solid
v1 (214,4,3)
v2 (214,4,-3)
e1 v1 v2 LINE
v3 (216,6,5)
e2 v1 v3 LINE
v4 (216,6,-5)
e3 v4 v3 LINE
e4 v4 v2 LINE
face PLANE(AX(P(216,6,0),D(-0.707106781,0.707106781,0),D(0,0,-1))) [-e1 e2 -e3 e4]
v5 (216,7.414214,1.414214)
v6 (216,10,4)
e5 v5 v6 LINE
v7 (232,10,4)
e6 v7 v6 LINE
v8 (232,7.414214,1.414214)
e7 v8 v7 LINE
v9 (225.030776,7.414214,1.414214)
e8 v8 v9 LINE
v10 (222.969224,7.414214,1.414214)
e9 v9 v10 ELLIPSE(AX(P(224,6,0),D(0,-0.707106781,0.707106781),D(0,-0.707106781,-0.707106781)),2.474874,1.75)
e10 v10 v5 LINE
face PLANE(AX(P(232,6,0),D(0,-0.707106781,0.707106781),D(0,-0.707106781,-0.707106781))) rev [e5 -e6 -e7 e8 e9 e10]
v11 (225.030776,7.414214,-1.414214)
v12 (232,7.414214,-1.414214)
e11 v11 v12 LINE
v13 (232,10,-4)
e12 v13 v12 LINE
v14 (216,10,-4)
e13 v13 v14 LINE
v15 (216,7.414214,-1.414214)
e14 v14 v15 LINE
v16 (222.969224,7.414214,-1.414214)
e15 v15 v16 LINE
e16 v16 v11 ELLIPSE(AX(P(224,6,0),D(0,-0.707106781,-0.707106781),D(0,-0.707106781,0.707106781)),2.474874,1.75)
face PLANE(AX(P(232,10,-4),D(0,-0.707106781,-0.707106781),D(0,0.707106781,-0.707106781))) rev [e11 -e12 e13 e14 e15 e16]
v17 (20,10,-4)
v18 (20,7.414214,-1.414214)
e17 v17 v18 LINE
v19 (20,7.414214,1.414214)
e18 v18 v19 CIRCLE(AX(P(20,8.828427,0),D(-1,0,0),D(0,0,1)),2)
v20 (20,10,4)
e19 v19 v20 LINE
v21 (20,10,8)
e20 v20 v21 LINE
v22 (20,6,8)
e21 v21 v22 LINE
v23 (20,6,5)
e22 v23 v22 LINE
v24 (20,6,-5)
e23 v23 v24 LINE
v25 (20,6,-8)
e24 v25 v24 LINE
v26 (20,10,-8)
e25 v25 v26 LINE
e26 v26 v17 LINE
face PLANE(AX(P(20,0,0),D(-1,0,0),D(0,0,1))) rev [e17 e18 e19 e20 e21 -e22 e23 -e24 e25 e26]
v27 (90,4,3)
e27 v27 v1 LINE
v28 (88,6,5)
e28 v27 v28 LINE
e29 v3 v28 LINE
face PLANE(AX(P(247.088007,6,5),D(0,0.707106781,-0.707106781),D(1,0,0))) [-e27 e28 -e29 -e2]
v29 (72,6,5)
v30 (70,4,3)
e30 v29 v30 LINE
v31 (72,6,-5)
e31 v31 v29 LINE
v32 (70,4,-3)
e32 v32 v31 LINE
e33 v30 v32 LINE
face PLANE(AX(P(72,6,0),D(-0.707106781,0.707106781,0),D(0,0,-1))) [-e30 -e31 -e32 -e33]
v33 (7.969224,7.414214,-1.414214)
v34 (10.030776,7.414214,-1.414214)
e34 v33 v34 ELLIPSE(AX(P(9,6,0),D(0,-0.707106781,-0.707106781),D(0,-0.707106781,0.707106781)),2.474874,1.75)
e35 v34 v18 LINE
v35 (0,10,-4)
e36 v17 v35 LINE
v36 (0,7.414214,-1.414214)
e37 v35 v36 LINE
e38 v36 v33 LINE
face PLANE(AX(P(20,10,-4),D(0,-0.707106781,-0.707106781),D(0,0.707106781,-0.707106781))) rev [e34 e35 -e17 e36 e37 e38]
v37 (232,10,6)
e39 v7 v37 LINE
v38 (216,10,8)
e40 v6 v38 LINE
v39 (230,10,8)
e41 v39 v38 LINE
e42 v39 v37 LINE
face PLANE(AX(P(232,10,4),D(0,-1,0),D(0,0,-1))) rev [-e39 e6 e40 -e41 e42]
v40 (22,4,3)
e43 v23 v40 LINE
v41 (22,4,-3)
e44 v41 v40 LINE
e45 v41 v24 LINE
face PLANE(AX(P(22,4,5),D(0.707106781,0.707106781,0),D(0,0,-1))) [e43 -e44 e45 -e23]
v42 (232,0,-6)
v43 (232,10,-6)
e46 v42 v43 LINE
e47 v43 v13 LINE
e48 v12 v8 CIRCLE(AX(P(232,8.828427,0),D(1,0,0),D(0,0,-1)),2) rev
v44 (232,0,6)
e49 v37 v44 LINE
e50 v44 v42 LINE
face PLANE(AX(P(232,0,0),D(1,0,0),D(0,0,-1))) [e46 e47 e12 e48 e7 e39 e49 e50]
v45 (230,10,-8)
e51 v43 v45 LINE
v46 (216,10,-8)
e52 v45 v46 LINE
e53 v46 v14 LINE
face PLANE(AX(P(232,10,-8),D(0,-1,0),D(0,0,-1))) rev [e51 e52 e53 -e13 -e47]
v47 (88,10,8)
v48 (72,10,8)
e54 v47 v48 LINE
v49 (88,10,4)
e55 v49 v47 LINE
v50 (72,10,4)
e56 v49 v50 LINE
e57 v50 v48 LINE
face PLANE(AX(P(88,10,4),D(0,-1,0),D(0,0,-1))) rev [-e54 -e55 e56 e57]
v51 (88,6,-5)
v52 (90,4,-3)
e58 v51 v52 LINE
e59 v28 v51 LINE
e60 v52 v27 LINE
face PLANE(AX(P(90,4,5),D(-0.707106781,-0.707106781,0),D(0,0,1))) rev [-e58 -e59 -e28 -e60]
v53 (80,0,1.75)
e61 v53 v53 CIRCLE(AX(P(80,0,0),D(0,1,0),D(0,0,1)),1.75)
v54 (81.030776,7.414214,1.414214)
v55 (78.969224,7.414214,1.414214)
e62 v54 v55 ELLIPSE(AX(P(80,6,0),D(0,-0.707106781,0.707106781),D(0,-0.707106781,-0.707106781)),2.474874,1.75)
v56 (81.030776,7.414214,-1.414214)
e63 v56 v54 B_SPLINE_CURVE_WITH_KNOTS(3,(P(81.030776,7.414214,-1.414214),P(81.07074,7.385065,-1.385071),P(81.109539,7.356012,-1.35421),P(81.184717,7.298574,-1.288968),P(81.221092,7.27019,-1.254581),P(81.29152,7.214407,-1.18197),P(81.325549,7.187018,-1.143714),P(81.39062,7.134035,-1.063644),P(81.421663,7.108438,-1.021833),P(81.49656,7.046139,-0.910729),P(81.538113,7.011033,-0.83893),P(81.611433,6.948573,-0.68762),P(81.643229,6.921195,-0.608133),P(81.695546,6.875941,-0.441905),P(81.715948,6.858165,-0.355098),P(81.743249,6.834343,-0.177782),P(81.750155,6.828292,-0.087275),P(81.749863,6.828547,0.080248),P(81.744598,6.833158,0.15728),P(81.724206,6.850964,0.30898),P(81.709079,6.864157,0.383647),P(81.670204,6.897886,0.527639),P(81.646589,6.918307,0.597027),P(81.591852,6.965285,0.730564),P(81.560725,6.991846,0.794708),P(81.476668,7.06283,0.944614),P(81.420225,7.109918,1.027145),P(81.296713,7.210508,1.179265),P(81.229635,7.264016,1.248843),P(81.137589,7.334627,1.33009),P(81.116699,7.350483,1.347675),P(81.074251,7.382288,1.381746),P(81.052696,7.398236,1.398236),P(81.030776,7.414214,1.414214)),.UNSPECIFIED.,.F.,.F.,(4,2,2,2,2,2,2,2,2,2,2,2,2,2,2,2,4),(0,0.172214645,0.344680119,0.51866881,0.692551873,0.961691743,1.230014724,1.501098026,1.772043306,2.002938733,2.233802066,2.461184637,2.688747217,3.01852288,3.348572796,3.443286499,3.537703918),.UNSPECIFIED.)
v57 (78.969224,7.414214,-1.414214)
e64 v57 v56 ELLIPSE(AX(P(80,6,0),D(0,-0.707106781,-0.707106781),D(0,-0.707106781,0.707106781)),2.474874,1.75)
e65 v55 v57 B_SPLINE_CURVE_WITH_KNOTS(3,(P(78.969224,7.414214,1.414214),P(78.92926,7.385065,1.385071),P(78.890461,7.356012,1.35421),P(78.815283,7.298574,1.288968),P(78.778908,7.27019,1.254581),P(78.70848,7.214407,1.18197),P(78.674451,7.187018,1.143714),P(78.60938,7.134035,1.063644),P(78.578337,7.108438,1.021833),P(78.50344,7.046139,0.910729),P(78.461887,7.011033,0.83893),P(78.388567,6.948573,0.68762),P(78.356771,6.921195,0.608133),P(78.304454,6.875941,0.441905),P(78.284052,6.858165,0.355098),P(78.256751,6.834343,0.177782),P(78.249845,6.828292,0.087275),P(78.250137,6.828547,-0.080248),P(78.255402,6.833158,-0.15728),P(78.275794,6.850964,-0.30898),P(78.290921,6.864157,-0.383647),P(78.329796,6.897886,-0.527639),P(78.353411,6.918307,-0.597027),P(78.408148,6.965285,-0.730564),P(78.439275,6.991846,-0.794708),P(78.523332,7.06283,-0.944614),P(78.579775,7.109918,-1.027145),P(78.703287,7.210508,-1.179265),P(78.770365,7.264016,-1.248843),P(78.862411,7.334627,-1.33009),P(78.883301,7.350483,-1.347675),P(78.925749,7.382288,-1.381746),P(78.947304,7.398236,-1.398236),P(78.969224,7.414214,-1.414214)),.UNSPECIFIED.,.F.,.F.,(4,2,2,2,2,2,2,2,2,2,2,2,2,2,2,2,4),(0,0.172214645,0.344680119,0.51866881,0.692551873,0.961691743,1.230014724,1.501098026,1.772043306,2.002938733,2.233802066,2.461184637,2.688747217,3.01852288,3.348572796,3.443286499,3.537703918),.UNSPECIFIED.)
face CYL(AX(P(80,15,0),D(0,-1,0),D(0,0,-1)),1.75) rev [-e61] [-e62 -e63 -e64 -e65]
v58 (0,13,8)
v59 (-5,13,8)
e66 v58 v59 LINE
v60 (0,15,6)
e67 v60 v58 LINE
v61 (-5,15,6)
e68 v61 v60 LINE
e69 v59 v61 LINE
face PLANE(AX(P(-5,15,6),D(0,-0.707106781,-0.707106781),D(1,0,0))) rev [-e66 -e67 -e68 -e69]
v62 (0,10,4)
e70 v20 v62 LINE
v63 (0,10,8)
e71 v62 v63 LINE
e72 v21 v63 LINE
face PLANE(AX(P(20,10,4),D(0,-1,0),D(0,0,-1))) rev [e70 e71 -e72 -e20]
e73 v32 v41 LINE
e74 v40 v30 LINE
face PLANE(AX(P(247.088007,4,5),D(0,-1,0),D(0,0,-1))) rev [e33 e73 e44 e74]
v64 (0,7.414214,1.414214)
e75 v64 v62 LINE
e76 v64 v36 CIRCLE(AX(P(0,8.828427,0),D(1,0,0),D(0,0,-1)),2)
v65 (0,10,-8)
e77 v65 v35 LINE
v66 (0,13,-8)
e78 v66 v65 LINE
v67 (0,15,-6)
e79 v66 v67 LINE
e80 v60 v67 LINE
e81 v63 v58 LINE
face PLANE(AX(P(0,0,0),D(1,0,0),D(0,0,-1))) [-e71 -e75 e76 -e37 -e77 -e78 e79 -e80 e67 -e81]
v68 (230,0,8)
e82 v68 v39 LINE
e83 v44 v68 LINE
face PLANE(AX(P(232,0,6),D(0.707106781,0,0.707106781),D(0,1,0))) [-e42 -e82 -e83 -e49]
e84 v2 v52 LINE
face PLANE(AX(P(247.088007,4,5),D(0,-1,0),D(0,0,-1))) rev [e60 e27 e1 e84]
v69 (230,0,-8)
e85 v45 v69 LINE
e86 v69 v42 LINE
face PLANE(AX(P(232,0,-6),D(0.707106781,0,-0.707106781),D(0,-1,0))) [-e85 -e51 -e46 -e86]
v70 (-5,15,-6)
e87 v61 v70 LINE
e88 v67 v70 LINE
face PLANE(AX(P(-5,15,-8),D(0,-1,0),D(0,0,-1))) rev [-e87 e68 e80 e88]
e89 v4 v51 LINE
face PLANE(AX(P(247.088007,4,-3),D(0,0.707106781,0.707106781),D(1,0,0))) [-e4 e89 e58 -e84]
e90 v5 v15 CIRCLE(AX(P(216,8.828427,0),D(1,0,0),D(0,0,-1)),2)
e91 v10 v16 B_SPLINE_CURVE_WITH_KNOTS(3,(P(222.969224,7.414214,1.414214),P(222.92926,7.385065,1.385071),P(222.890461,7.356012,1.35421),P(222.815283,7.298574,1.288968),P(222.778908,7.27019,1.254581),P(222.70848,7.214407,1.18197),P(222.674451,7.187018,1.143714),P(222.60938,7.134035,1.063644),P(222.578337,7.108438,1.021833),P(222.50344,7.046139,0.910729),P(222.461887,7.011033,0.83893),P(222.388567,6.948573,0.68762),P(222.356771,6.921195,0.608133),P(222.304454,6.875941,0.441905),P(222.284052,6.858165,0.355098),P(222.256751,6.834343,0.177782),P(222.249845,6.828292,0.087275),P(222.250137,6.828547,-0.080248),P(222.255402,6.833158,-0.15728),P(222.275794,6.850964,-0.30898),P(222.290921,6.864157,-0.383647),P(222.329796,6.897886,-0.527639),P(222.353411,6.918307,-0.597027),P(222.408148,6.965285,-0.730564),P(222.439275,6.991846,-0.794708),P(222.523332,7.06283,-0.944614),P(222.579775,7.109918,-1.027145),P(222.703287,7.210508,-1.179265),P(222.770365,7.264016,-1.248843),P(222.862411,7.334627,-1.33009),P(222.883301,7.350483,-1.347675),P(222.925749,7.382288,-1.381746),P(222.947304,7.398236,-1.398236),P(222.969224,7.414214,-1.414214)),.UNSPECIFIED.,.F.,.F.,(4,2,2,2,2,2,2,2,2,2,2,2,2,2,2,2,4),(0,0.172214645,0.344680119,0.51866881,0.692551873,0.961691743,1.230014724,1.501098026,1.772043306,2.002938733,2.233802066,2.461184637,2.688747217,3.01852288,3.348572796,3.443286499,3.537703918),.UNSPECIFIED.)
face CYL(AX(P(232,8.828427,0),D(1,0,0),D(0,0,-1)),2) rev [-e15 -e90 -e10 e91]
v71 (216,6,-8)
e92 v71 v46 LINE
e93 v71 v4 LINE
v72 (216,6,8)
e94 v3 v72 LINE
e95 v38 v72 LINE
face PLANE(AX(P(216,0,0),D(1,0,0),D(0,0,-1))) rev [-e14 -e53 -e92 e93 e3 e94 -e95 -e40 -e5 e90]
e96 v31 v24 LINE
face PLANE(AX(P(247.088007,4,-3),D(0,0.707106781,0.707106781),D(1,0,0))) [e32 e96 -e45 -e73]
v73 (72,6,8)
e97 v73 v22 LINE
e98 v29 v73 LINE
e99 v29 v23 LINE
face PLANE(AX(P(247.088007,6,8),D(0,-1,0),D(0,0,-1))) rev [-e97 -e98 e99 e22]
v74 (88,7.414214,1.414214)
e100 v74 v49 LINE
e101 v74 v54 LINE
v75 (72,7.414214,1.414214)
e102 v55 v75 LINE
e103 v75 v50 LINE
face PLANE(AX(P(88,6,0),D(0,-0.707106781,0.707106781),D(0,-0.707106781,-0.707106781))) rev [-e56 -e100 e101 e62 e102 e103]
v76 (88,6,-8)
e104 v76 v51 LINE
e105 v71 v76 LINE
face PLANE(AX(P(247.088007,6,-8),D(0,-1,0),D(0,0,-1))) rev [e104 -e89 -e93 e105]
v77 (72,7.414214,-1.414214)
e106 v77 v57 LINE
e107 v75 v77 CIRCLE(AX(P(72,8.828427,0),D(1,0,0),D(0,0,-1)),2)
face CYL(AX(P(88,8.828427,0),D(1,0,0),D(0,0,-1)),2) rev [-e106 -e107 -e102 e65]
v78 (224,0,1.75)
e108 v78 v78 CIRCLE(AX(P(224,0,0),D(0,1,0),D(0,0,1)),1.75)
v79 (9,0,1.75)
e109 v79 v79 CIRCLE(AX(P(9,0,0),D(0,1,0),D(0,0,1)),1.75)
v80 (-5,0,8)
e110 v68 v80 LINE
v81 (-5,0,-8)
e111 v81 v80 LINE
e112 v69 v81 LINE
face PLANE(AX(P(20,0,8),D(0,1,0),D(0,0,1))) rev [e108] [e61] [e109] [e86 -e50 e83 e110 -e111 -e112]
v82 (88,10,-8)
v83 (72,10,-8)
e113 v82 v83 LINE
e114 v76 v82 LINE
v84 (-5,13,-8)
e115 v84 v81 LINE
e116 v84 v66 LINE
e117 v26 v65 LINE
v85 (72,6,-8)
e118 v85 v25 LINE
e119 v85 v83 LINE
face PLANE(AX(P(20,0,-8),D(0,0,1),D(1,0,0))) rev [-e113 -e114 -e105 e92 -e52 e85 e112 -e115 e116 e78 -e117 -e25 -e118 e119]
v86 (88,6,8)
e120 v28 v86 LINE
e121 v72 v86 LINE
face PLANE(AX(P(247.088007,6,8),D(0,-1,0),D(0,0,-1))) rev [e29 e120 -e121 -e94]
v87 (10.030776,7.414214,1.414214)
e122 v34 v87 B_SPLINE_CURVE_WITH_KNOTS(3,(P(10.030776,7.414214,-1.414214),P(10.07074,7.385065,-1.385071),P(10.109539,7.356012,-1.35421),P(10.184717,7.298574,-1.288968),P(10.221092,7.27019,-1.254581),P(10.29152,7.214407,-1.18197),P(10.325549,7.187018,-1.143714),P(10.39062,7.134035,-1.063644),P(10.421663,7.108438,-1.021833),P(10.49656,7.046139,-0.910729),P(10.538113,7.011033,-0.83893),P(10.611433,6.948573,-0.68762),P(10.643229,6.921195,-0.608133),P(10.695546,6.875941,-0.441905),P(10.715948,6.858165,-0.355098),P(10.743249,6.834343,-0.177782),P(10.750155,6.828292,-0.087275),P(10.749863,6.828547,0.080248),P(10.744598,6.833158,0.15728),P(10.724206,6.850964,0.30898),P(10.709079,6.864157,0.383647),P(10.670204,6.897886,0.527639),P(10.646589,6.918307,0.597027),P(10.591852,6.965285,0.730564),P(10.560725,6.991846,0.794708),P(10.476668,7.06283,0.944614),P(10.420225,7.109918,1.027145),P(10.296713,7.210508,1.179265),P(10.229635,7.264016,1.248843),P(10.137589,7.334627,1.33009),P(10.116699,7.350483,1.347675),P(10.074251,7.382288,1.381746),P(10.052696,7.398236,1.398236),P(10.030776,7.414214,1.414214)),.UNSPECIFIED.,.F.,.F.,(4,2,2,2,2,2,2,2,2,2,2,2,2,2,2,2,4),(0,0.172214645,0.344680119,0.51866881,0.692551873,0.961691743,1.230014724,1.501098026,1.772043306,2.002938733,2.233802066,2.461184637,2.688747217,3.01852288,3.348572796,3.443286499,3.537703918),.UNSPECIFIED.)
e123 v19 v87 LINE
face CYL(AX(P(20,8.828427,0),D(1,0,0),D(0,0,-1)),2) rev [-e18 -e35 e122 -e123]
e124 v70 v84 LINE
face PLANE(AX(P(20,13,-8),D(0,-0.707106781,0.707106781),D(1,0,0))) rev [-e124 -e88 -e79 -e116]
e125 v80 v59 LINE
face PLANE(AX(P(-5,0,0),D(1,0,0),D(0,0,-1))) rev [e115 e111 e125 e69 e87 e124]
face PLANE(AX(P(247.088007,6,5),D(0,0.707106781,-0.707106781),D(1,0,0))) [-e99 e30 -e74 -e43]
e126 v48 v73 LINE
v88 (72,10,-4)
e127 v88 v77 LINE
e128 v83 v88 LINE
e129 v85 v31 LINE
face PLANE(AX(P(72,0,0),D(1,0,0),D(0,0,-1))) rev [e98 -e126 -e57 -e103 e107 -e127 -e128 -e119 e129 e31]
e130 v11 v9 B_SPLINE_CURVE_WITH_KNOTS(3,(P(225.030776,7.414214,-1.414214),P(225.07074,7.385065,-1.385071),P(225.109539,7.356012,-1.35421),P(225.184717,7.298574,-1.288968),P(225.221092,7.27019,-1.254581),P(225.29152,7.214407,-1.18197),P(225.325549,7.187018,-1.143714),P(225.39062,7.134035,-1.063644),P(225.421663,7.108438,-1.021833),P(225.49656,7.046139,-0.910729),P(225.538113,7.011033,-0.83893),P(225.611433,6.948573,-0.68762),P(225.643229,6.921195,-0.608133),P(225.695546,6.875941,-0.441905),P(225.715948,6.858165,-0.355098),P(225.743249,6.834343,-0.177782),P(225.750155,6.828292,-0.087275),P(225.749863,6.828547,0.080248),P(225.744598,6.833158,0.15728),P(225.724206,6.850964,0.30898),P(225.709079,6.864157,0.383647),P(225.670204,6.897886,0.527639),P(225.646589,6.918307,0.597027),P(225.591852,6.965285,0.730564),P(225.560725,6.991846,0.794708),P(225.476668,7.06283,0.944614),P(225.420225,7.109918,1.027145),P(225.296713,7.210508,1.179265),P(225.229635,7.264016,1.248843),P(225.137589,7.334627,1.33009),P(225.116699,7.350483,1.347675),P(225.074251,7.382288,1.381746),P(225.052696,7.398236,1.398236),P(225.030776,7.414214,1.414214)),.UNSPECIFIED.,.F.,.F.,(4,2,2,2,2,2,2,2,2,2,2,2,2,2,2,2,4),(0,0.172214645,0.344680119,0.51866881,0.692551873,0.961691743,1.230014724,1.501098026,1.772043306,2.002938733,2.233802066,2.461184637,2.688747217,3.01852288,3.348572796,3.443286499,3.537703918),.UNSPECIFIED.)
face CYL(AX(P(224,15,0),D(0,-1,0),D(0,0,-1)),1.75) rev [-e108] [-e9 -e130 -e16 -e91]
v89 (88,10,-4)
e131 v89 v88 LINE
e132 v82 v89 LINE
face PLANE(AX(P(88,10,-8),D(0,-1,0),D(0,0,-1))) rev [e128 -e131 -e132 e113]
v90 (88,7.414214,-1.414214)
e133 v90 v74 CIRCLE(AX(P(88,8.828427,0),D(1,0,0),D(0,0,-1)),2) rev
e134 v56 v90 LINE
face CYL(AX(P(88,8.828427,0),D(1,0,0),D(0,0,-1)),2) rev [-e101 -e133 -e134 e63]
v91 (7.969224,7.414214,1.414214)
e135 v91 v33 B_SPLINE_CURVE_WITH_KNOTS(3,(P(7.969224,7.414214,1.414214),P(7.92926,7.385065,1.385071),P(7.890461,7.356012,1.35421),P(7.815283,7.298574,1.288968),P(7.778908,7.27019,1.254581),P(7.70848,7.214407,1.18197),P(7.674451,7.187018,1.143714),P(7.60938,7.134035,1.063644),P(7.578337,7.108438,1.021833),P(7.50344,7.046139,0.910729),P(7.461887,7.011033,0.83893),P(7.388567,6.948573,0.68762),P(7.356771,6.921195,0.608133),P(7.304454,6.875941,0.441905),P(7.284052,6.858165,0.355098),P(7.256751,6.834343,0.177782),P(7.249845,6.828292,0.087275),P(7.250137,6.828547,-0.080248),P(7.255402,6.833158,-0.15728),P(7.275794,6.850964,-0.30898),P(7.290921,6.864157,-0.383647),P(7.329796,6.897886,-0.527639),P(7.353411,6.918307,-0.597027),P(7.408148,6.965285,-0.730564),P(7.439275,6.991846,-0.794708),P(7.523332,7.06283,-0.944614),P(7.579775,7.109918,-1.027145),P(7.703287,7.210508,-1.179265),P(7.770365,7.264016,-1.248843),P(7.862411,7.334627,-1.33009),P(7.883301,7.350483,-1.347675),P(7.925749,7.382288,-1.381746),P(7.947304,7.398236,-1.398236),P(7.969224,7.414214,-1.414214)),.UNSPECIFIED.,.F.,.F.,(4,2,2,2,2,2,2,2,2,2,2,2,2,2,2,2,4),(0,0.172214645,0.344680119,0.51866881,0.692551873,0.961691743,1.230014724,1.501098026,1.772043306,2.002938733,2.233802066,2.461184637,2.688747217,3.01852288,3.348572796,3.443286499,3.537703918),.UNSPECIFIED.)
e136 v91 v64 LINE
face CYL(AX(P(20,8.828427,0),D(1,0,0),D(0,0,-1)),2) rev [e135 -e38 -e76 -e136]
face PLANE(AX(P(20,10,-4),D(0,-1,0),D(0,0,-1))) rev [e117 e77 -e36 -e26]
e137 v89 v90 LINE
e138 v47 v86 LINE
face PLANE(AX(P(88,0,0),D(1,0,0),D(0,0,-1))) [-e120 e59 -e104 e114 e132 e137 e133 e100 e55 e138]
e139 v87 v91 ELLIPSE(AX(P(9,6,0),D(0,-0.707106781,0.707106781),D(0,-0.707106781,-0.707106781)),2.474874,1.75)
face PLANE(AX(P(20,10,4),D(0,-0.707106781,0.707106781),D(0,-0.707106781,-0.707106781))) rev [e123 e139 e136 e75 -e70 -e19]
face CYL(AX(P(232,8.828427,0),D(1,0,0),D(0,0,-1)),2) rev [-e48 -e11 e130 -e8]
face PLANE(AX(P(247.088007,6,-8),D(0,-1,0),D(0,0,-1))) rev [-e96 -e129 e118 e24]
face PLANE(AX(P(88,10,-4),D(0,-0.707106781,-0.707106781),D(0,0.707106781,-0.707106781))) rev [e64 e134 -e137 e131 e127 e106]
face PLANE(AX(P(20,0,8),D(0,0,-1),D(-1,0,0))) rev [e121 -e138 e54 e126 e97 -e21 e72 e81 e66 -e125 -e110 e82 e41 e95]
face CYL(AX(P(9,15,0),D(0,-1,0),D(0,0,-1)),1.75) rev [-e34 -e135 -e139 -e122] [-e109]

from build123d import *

# Parameters (mm, degrees)
EXTRUDE_1_DEPTH          = 20
SKETCH_2_W               = 16
SKETCH_2_H               = 15
EXTRUDE_2_DEPTH          = 5
EXTRUDE_3_DEPTH          = 210
EXTRUDE_4_DEPTH          = 8
PATTERN_LINEAR_1_COUNT   = 2
PATTERN_LINEAR_1_PITCH   = 144
FILLET_1_R               = 2
CHAMFER_1_SIZE           = 2
CUT_EXTRUDE_1_DEPTH      = 233.622010996
CUT_EXTRUDE_1_DEPTH_BACK = 233.622010996
SKETCH_5_R               = 1.75


with BuildPart() as part:
    # Эскиз1 → Бобышка-Вытянуть1 (new body)
    with BuildSketch(Plane(origin=(0, 0, 0), x_dir=(0, 0, -1), z_dir=(1, 0, 0))):
        Polygon((-8, 0), (8, 0), (8, 10), (4, 10), (0, 6), (-4, 10), (-8, 10), align=None)
    extrude(amount=EXTRUDE_1_DEPTH)

    # Эскиз2 → Бобышка-Вытянуть2 (add)
    with BuildSketch(Plane.ZY):
        with Locations((0, 7.5)):
            Rectangle(SKETCH_2_W, SKETCH_2_H)
    extrude(amount=EXTRUDE_2_DEPTH)

    # Эскиз3 → Бобышка-Вытянуть3 (add)
    with BuildSketch(Plane(origin=(20, 0, 0), x_dir=(0, 0, -1), z_dir=(1, 0, 0))):
        Polygon((-8, 0), (8, 0), (8, 4), (8, 6), (5, 6), (5, 4), (-5, 4), (-5, 6), (-8, 6), (-8, 4), align=None)
    extrude(amount=EXTRUDE_3_DEPTH)

    # Эскиз4 → Бобышка-Вытянуть4 (add, symmetric)
    with BuildSketch(Plane(origin=(80, 0, 0), x_dir=(0, 0, -1), z_dir=(1, 0, 0))):
        Polygon((-8, 0), (8, 0), (8, 10), (4, 10), (0, 6), (-4, 10), (-8, 10), align=None)
    extrude_4 = extrude(amount=EXTRUDE_4_DEPTH, both=True)

    # Линейный массив1: Бобышка-Вытянуть4 ×2
    with Locations(*[(i * PATTERN_LINEAR_1_PITCH, 0, 0) for i in range(1, PATTERN_LINEAR_1_COUNT)]):
        add(extrude_4)

    # Скругление1
    fillet_1_edges = [part.edges().sort_by_distance(p)[0] for p in [
        (224, 6, 0),
        (10, 6, 0),
        (80, 6, 0),
    ]]
    fillet(fillet_1_edges, radius=FILLET_1_R)

    # Фаска1
    chamfer_1_edges = [part.edges().sort_by_distance(p)[0] for p in [
        (232, 5, -8),
        (232, 5, 8),
        (216, 4, 0),
        (152, 4, -5),
        (88, 4, 0),
        (152, 4, 5),
        (20, 4, 0),
        (46, 4, 5),
        (72, 4, 0),
        (46, 4, -5),
        (-2.5, 15, -8),
        (-2.5, 15, 8),
    ]]
    chamfer(chamfer_1_edges, length=CHAMFER_1_SIZE - 0.0001)  # a hair under: the kernel refuses the full size

    # Эскиз5 → Вырез-Вытянуть1 (cut, two sides: drawn at the far end of the back side and taken through both)
    with BuildSketch(Plane.XZ.offset(-CUT_EXTRUDE_1_DEPTH_BACK)):
        with Locations(Location((9, 0, 0), (0, 0, 306.087147066))):
            Circle(SKETCH_5_R)
        with Locations(Location((80, 0, 0), (0, 0, 306.087147066))):
            Circle(SKETCH_5_R)
        with Locations(Location((224, 0, 0), (0, 0, 306.087147066))):
            Circle(SKETCH_5_R)
    extrude(amount=CUT_EXTRUDE_1_DEPTH + CUT_EXTRUDE_1_DEPTH_BACK, mode=Mode.SUBTRACT)


solid = part.part
